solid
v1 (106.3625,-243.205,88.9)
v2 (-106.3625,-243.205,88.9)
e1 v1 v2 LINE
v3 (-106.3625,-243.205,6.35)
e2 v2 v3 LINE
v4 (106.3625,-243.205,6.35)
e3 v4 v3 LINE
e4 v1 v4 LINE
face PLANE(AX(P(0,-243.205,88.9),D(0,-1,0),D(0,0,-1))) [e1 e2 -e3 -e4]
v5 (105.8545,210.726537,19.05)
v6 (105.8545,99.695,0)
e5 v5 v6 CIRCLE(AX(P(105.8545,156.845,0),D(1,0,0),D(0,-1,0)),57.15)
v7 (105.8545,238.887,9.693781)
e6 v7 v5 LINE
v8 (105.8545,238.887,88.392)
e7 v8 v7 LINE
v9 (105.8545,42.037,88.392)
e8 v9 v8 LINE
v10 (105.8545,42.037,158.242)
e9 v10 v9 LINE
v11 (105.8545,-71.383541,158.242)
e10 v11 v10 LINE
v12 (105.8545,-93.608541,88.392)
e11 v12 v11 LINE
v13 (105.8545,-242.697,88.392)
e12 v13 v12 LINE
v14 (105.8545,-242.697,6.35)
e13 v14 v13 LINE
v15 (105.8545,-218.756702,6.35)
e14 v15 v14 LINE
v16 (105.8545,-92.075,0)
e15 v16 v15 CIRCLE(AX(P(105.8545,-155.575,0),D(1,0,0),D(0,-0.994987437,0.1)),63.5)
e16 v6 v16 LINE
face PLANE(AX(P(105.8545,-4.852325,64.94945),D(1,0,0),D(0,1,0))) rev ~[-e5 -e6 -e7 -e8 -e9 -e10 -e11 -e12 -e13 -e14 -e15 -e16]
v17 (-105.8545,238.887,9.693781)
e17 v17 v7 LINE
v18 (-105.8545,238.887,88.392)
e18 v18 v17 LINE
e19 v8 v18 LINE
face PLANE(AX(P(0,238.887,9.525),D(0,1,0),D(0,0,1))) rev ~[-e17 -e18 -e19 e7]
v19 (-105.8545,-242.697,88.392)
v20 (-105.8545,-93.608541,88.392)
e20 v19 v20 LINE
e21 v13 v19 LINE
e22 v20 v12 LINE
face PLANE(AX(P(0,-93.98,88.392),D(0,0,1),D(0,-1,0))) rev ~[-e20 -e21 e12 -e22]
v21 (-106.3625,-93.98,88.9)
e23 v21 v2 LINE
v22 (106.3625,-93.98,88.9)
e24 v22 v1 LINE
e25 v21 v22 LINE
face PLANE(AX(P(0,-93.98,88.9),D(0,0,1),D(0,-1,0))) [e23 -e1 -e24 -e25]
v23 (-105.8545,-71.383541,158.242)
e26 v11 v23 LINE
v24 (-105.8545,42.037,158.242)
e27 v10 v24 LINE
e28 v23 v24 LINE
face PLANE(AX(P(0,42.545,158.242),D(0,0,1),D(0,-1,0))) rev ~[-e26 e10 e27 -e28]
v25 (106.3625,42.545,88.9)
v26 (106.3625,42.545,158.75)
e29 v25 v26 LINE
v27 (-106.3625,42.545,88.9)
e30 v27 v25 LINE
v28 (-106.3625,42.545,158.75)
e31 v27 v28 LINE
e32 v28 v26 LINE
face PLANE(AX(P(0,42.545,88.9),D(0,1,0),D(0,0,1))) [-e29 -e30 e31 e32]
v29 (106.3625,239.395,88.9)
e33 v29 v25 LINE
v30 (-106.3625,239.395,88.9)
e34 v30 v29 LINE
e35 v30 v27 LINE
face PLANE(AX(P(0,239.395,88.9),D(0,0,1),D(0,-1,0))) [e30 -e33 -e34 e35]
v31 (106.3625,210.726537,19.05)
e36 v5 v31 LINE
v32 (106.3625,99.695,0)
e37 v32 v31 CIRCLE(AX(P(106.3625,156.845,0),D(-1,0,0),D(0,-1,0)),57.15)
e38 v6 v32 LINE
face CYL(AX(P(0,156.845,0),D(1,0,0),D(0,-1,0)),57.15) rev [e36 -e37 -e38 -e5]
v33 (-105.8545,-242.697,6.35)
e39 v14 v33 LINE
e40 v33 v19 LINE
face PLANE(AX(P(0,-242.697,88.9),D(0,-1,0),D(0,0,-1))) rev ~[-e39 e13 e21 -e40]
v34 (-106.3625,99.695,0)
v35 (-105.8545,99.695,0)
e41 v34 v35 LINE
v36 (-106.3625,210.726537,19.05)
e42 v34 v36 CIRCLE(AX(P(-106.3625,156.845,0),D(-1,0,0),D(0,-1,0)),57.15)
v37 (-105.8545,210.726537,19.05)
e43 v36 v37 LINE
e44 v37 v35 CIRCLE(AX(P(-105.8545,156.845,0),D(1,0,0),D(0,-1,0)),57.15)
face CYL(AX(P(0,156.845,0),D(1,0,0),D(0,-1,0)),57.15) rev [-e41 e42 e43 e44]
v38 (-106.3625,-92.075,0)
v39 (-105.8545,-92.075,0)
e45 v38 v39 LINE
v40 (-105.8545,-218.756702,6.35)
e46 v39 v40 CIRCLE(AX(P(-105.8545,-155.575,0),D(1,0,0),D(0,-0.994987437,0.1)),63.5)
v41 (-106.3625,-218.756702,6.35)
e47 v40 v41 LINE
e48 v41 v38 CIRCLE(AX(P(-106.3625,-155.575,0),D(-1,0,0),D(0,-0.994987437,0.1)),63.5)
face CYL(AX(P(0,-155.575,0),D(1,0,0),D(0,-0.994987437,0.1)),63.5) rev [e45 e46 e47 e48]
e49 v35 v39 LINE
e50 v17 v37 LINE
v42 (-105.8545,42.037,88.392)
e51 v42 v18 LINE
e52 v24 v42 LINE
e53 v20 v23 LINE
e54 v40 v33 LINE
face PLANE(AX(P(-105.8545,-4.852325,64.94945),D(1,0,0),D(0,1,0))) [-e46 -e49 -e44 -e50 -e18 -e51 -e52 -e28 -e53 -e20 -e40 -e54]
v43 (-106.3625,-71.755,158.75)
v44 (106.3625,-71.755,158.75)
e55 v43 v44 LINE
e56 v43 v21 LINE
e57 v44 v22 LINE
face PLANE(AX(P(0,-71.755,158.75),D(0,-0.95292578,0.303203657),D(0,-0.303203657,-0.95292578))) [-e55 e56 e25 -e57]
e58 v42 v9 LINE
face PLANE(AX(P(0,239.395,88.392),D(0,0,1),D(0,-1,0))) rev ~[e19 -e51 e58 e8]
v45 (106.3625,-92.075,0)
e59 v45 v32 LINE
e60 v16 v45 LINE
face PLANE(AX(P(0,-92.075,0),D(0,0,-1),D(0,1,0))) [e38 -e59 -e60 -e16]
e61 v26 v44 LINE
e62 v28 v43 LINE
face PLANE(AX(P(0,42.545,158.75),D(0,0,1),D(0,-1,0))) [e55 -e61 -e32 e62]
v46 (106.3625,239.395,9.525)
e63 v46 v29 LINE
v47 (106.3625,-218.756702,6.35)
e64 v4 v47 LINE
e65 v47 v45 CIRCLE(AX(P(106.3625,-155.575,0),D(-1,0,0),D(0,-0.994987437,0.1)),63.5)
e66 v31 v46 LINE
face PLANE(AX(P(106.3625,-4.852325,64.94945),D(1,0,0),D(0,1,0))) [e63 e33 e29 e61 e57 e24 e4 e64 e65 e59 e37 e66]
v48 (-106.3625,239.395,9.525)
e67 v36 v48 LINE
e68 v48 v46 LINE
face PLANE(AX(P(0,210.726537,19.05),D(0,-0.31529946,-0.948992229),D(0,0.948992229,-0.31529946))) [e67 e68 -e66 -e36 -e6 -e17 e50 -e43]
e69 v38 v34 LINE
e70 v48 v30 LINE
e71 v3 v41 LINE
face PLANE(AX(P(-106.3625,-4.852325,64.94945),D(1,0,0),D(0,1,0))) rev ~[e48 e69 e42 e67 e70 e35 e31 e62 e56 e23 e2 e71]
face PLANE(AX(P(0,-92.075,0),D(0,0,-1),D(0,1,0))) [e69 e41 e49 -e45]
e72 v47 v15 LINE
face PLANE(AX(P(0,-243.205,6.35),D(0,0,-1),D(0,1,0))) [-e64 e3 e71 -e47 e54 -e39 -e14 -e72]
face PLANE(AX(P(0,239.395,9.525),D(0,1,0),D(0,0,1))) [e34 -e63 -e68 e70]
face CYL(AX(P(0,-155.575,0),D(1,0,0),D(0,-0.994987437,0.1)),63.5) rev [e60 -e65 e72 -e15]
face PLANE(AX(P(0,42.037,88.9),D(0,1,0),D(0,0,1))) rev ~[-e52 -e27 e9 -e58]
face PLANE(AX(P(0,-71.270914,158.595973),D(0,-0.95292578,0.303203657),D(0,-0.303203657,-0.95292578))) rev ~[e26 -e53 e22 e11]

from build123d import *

# Parameters (mm, degrees)
F1_DEPTH = 106.3625
F2_T     = -0.508


with BuildPart() as f1:
    # F0 (on Right) → F1 (new body, symmetric)
    with BuildSketch(Plane.YZ):
        with BuildLine():
            ThreePointArc((-218.7567022563, 6.35), (-152.3960137837, 63.4203756425), (-92.075, 0))
            Line((-92.075, 0), (0, 0))
            Line((0, 0), (99.695, 0))
            ThreePointArc((99.695, 0), (147.1808219158, 56.3269576842), (210.7265367264, 19.05))
            Line((210.7265367264, 19.05), (239.395, 9.525))
            Line((239.395, 9.525), (239.395, 88.9))
            Line((239.395, 88.9), (42.545, 88.9))
            Line((42.545, 88.9), (42.545, 158.75))
            Line((42.545, 158.75), (-71.755, 158.75))
            Line((-71.755, 158.75), (-93.98, 88.9))
            Line((-93.98, 88.9), (-243.205, 88.9))
            Line((-243.205, 88.9), (-243.205, 6.35))
            Line((-243.205, 6.35), (-218.7567022563, 6.35))
        make_face()
    extrude(amount=F1_DEPTH, both=True)

    # F2
    f2_openings = [f1.faces().sort_by_distance(p)[0] for p in [
        (0, 3.81, 0),
        (0, 147.180822, 56.326958),
        (0, 225.060768, 14.2875),
        (0, -152.396014, 63.420376),
        (0, -230.980851, 6.35),
    ]]
    offset(amount=F2_T, openings=f2_openings, kind=Kind.INTERSECTION)


solid = f1.part
